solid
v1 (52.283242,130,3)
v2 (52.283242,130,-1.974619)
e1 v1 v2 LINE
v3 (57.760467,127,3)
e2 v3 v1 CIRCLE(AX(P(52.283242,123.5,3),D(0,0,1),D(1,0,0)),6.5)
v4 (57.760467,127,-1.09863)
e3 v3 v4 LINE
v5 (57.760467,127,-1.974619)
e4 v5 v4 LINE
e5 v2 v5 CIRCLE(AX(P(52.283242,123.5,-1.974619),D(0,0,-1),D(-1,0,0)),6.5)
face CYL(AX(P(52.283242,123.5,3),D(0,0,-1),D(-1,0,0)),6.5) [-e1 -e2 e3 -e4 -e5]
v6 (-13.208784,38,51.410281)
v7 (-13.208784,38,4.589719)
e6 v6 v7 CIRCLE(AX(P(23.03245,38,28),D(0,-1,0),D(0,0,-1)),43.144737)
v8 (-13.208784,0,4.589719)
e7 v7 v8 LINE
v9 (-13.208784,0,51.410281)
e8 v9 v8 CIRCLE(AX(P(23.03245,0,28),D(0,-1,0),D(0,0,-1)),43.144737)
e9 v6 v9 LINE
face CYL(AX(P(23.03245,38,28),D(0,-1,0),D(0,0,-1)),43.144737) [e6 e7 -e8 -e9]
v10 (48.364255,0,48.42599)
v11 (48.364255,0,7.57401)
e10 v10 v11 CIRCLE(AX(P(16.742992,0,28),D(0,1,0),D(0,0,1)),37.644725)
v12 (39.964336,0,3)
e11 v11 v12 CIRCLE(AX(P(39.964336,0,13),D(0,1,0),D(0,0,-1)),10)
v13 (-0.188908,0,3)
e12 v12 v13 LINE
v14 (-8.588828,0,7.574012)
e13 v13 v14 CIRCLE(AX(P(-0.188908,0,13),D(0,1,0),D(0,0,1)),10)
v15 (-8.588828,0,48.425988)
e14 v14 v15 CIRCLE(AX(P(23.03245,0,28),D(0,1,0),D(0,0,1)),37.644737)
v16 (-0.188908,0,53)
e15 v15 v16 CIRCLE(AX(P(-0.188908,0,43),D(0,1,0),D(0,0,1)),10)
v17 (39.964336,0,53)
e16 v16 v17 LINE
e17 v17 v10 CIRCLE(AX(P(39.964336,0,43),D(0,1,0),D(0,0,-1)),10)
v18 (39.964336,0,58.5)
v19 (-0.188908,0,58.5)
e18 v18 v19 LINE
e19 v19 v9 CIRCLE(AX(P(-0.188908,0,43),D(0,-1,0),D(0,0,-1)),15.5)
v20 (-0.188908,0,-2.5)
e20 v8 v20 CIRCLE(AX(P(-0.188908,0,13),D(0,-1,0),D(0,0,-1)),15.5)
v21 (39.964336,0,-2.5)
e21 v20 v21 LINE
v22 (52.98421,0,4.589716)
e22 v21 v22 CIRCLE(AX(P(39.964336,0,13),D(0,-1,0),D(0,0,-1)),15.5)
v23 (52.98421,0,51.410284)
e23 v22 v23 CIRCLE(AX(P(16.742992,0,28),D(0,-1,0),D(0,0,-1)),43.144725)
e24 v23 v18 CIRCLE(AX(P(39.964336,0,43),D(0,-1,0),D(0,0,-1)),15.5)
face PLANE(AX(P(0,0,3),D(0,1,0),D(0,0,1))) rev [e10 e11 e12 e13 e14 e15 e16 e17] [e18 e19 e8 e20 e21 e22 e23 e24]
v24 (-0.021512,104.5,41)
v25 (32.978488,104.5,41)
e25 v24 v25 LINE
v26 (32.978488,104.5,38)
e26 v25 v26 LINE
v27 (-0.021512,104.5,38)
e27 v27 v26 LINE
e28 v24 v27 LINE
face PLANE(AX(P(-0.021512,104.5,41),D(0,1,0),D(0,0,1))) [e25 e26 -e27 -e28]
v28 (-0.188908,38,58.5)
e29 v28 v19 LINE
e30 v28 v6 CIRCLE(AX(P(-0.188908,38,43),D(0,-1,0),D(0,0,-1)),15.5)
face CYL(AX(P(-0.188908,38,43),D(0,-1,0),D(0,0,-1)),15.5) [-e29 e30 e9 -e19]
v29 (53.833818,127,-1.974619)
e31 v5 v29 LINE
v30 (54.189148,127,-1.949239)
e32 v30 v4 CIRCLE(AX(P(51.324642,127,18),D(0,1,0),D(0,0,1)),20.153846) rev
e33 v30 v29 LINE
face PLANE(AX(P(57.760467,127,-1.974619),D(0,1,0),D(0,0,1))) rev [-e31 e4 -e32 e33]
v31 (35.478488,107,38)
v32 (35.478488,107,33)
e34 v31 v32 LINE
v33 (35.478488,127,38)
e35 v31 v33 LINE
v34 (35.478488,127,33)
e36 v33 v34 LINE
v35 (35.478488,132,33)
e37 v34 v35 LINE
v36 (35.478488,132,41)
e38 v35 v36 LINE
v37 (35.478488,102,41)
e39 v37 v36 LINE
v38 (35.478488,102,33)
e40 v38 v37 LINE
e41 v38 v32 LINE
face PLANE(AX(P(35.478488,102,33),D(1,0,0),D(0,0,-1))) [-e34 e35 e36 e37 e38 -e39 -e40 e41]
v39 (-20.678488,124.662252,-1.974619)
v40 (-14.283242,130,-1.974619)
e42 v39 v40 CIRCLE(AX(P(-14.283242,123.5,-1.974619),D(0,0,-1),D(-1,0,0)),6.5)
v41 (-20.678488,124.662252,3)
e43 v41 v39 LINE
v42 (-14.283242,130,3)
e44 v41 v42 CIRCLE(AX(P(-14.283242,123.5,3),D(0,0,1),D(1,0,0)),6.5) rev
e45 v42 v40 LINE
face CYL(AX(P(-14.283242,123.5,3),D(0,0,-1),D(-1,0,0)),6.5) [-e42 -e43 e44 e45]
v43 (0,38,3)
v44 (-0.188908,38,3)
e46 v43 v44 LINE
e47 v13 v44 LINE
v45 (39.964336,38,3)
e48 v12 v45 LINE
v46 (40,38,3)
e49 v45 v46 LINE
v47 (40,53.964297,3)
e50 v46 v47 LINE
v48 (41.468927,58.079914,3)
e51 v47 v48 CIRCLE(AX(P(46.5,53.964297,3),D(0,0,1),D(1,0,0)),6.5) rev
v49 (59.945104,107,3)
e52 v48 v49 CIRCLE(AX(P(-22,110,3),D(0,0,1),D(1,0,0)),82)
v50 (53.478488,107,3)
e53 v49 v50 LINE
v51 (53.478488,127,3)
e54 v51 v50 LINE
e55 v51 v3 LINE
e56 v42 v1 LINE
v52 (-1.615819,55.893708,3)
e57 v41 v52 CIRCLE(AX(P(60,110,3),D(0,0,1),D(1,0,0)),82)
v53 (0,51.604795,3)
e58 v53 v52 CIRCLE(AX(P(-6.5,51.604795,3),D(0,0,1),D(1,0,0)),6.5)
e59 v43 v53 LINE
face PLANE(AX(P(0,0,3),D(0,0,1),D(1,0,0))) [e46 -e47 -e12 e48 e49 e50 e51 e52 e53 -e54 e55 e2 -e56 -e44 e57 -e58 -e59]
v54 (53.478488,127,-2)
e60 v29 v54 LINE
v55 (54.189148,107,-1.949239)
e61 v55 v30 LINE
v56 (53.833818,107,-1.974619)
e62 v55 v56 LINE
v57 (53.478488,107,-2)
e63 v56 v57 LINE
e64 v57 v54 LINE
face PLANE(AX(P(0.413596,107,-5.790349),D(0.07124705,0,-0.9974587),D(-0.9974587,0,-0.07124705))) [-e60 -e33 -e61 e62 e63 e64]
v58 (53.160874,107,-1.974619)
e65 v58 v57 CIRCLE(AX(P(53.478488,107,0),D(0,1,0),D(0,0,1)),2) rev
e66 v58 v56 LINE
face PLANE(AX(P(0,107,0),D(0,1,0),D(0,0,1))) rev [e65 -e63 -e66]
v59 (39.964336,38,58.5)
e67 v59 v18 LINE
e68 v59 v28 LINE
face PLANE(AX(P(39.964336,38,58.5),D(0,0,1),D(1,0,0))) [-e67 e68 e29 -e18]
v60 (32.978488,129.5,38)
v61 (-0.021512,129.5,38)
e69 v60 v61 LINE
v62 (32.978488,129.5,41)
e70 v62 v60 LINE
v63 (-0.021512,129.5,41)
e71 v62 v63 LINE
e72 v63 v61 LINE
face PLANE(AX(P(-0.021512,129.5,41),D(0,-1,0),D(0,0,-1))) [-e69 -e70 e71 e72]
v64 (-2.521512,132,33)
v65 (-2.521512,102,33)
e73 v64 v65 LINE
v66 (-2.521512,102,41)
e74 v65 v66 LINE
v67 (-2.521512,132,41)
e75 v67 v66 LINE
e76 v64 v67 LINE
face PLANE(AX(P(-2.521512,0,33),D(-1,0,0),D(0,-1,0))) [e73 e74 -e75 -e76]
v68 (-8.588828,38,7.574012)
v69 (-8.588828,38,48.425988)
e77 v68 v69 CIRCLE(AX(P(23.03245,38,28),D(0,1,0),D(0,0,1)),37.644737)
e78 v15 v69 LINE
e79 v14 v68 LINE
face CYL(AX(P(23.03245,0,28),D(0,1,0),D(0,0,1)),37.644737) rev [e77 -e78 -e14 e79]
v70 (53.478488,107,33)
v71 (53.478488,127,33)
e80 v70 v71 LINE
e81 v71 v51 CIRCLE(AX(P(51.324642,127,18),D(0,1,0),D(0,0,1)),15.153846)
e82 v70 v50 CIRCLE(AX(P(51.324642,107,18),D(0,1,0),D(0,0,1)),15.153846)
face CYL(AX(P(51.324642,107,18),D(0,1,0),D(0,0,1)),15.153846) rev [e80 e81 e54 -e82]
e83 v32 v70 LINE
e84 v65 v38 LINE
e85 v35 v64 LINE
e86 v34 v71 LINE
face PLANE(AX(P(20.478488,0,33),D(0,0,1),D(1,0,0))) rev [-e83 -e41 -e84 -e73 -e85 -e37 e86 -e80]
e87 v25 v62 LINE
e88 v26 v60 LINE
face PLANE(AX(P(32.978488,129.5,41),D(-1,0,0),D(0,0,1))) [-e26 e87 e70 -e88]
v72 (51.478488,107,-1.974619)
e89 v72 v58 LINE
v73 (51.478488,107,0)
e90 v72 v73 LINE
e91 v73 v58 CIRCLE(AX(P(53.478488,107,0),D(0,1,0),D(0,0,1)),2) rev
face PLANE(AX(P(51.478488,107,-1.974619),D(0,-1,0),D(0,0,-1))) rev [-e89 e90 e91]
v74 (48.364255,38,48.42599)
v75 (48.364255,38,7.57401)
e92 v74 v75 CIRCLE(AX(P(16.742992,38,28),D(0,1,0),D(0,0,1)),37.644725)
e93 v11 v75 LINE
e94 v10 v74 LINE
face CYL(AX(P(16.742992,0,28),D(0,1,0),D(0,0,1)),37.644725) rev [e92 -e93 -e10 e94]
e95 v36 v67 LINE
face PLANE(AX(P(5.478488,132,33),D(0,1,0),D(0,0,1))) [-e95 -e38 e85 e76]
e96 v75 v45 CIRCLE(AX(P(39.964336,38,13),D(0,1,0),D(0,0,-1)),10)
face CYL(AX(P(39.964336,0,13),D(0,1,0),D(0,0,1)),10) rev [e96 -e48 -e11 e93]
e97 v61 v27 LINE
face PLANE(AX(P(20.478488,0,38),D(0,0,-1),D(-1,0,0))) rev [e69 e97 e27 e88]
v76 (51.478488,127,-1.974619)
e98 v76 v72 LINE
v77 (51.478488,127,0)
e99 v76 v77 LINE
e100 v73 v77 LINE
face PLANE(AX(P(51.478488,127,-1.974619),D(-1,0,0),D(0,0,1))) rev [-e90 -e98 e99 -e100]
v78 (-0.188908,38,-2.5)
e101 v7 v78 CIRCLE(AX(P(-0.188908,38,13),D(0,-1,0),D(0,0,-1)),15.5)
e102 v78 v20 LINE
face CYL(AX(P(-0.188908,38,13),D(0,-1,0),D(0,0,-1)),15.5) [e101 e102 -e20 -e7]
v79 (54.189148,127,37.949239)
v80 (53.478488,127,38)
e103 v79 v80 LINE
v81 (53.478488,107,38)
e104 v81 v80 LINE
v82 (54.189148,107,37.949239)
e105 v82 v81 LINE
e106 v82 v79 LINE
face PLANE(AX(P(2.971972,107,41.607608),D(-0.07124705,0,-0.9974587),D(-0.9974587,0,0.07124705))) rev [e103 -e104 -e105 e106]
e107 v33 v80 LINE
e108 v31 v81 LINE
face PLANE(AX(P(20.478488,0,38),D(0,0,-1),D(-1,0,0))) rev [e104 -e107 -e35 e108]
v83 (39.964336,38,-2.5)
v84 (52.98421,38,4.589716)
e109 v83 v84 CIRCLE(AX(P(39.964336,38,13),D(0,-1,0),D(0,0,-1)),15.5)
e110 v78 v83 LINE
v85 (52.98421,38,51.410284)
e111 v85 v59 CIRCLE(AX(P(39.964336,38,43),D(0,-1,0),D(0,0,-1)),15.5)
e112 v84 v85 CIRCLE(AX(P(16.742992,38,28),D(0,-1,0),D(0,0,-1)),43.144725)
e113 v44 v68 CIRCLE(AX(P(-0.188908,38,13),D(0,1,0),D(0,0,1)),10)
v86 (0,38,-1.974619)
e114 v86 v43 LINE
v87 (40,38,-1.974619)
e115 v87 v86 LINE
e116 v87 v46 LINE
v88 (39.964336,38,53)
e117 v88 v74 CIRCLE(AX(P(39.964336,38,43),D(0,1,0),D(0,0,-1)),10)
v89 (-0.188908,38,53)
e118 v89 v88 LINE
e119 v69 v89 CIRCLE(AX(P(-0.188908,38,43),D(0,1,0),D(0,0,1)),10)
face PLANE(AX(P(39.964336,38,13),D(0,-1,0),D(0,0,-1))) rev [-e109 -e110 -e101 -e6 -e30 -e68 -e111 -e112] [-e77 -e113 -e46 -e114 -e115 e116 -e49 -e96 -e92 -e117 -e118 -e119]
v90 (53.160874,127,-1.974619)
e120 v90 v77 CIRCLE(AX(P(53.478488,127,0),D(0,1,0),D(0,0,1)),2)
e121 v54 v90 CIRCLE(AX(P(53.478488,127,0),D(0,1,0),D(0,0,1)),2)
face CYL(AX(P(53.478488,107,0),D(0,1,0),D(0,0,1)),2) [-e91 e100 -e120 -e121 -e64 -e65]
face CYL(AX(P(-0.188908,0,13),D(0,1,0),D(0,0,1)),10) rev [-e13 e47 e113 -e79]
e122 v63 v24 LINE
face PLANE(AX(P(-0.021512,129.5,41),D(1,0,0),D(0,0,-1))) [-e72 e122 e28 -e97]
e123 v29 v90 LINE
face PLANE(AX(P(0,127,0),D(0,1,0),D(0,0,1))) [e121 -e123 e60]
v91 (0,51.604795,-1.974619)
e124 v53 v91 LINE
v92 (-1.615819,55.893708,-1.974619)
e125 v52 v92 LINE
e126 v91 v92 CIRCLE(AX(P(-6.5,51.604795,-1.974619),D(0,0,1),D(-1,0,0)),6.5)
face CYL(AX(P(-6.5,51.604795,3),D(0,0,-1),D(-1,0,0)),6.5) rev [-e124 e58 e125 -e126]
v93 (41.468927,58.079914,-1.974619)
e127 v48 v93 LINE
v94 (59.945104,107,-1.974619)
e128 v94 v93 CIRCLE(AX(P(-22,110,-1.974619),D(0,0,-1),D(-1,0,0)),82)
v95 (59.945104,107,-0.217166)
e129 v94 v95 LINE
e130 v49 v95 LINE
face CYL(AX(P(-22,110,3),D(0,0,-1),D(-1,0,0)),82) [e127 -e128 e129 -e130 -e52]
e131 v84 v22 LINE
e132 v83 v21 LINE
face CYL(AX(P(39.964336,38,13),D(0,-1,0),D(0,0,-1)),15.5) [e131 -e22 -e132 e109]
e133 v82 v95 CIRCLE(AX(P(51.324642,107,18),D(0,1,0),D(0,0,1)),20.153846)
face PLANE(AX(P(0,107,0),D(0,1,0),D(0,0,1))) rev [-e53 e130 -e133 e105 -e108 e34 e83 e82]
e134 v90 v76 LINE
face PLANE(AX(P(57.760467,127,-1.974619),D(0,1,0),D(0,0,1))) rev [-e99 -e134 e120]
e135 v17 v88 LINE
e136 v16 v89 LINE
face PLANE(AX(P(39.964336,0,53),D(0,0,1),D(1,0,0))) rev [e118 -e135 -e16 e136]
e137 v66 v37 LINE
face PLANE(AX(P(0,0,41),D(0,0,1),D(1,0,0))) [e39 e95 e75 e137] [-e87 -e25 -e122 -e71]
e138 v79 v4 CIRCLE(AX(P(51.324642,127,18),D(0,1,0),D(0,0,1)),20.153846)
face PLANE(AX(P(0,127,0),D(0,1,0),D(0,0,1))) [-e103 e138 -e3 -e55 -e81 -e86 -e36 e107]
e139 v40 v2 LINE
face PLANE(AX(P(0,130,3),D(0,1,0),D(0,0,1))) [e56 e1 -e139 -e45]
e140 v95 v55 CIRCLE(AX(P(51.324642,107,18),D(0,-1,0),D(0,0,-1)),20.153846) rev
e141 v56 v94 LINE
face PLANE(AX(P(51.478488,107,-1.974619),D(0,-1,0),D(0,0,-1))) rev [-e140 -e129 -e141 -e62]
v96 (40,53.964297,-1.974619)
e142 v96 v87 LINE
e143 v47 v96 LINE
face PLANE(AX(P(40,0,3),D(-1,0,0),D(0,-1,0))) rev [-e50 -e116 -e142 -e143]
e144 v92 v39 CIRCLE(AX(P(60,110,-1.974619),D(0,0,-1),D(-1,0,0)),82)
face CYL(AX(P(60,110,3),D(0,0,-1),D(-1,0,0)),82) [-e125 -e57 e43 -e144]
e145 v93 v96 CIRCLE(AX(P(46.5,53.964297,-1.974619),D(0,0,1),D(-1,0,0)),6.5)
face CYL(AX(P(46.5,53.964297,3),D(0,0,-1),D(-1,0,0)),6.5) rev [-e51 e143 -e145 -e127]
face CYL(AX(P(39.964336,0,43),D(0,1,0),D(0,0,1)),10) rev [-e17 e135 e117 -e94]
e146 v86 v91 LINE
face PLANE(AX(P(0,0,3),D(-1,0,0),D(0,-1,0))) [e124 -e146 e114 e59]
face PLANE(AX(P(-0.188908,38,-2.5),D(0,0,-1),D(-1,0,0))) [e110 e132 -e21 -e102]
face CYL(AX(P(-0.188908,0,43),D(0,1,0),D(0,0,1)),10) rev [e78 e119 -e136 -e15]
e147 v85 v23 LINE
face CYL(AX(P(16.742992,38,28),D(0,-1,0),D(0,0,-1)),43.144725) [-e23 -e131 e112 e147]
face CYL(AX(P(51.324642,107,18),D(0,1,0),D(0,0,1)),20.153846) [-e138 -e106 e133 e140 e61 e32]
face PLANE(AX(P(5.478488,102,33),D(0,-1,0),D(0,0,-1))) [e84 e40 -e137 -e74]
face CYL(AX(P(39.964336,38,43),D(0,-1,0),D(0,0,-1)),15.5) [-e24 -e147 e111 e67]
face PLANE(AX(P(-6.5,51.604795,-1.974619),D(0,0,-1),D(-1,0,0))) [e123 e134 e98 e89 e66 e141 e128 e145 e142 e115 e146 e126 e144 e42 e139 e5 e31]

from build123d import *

# Parameters (mm, degrees)
CROQUIS1_W               = 2.2
CROQUIS1_H               = 25.999999999999993
CROQUIS1_W_2             = 2.200000000000003
CROQUIS1_H_2             = 26
SALIENTE_EXTRUIR2_DEPTH  = 3
SALIENTE_EXTRUIR3_DEPTH  = 20
CROQUIS3_R               = 7.999999999999991
CROQUIS3_R_2             = 8.000000000000002
CORTAR_EXTRUIR1_DEPTH    = 20
SALIENTE_EXTRUIR5_DEPTH  = 53.964297
CORTAR_EXTRUIR2_START    = -60
CROQUIS6_W               = 40.15324264759986
CROQUIS6_H               = 15.964297095512393
CORTAR_EXTRUIR2_DEPTH    = 60
CROQUIS7_W               = 5
CROQUIS7_H               = 20
SALIENTE_EXTRUIR7_DEPTH  = 33
SALIENTE_EXTRUIR8_START  = -5
CROQUIS9_W               = 30
CROQUIS9_H               = 30
SALIENTE_EXTRUIR8_DEPTH  = 5
SALIENTE_EXTRUIR9_START  = -20
SALIENTE_EXTRUIR9_DEPTH  = 20
SALIENTE_EXTRUIR10_START = -3
CROQUIS11_W              = 73.35697538547257
CROQUIS11_H              = 26
CROQUIS11_W_2            = 36
CROQUIS11_H_2            = 25.999999999999993
SALIENTE_EXTRUIR10_DEPTH = 3
CROQUIS12_R              = 15
CROQUIS12_R_2            = 12.499999999999995
SALIENTE_EXTRUIR13_DEPTH = 10
REDONDEO1_R              = 2
CORTAR_EXTRUIR4_DEPTH    = 134.84384260338862
SALIENTE_EXTRUIR15_DEPTH = 38
CROQUIS17_W              = 46
CROQUIS17_H              = 3
CORTAR_EXTRUIR5_DEPTH    = 20
CROQUIS18_W              = 58.34795028380313
CROQUIS18_H              = 55.73720719090147
CORTAR_EXTRUIR6_DEPTH    = 10
SALIENTE_EXTRUIR16_START = -5
SALIENTE_EXTRUIR16_DEPTH = 5
CROQUIS21_W              = 38.00000000000001
CROQUIS21_H              = 29.99999999999997
CROQUIS21_W_2            = 33.00000000000001
CROQUIS21_H_2            = 24.999999999999957
SALIENTE_EXTRUIR17_DEPTH = 3
SALIENTE_EXTRUIR18_DEPTH = 38
SALIENTE_EXTRUIR19_DEPTH = 1.974619


with BuildPart() as part:
    # Croquis1 → Saliente-Extruir2 (new body)
    with BuildSketch(Plane.XY):
        with BuildLine():
            ThreePointArc((1.78e-15, 6.500000000000045), (1.9038059222874422, 1.9038059222874395), (6.500000000000047, 0))
            Line((6.500000000000047, 0), (33.49999999999996, 0))
            ThreePointArc((33.49999999999996, 8.9e-16), (38.09619407771257, 1.9038059222874377), (40.00000000000001, 6.500000000000045))
            Line((40.00000000000001, 6.500000000000045), (39.99999999999999, 53.9642970955124))
            ThreePointArc((39.99999999999999, 53.9642970955124), (40.37823647136178, 56.149248193234044), (41.468926553672304, 58.07991369301713))
            ThreePointArc((41.468926553672304, 58.079913693017126), (57.39093897053555, 89.4797950941834), (58.67848769273629, 124.66225165562912))
            ThreePointArc((58.678487692736276, 124.66225165562913), (56.44829659298618, 128.49022222759615), (52.28324171709256, 130))
            Line((52.28324171709256, 130), (40.00000000000001, 130))
            Line((40.00000000000001, 130), (0, 130))
            Line((0, 130), (-14.283241717092526, 130))
            ThreePointArc((-14.283241717092526, 130), (-18.44829659298616, 128.49022222759615), (-20.678487692736265, 124.66225165562913))
            ThreePointArc((-20.67848769273626, 124.66225165562913), (-19.02022266397784, 88.0955618621395), (-1.615819209039536, 55.89370809971405))
            ThreePointArc((-1.6158192090395262, 55.89370809971404), (-0.41735357178952714, 53.89639076148384), (1.332e-14, 51.6047947173743))
            Line((1.324e-14, 51.6047947173743), (1.67e-15, 6.500000000000047))
        make_face()
        with Locations((3.1, 21.999999999999996)):
            Rectangle(CROQUIS1_W, CROQUIS1_H, mode=Mode.SUBTRACT)
        with Locations((36.9, 21.999999999999996)):
            Rectangle(CROQUIS1_W_2, CROQUIS1_H, mode=Mode.SUBTRACT)
        Polygon((-17.67848769273627, 127), (-15.478487692736273, 127), (-15.47848769273627, 101), (-17.678487692736265, 101), align=None, mode=Mode.SUBTRACT)
        with Locations((54.5784876927363, 114.00000000000001)):
            Rectangle(CROQUIS1_W_2, CROQUIS1_H_2, mode=Mode.SUBTRACT)
    extrude(amount=SALIENTE_EXTRUIR2_DEPTH)

    # Croquis2 → Saliente-Extruir3 (add)
    with BuildSketch(Plane(origin=(0, 0, 0), x_dir=(-1, 0, 0), z_dir=(0, 0, -1))):
        Polygon((4.481512307263694, 116.39887057980759), (4.481512307263693, 113.39887057980759), (-41.51848769273631, 113.39887057980758), (-41.51848769273631, 116.39887057980758), align=None)
    extrude(amount=SALIENTE_EXTRUIR3_DEPTH)

    # Croquis3 → Cortar-Extruir1 (cut)
    with BuildSketch(Plane(origin=(3.512e-14, 116.39887057980759, 0), x_dir=(1, -3e-16, 0), z_dir=(3e-16, 1, 0))):
        with Locations(Location((31.51848769273627, 9.999999999999998, 0), (0, 0, 180))):
            Circle(CROQUIS3_R)
        with Locations(Location((5.5184876927362705, 9.999999999999993, 0), (0, 0, 180))):
            Circle(CROQUIS3_R_2)
        Polygon((24.01848769273627, 20.000000000000004), (18.518487692736272, 20.000000000000004), (18.518487692736272, 15.000000000000005), (24.018487692736272, 15.000000000000004), align=None)
        Polygon((18.518487692736272, 15.000000000000005), (18.518487692736272, 20), (13.018487692736274, 20.000000000000004), (13.018487692736274, 15.000000000000005), align=None)
    extrude(amount=-CORTAR_EXTRUIR1_DEPTH, mode=Mode.SUBTRACT)

    # Croquis5 → Saliente-Extruir5 (add)
    with BuildSketch(Plane.XZ):
        with BuildLine():
            Line((39.96433456524687, 63.000000000000014), (-0.18890808235298706, 63.000000000000014))
            ThreePointArc((-0.18890808235298706, 63.000000000000014), (-7.362306106958867, 61.1735477674232), (-12.788788286604273, 56.138981437410735))
            ThreePointArc((-12.788788286604273, 56.138981437410735), (-19.612286758553036, 32.99999999999998), (-12.788788286604271, 9.861018562589255))
            ThreePointArc((-12.788788286604271, 9.861018562589255), (-7.362306106958855, 4.826452232576806), (-0.18890808235298392, 2.9999999999999956))
            Line((-0.18890808235298392, 2.9999999999999956), (39.96433456524688, 3))
            ThreePointArc((39.96433456524688, 3), (47.137732589852746, 4.826452232576804), (52.56421476949815, 9.861018562589242))
            ThreePointArc((52.56421476949815, 9.861018562589242), (59.38771324144694, 33.00000000000001), (52.56421476949814, 56.13898143741078))
            ThreePointArc((52.56421476949814, 56.13898143741078), (47.13773258985273, 61.17354776742321), (39.96433456524687, 63.000000000000014))
        make_face()
        with BuildLine():
            Line((39.96433456524688, 8), (-0.18890808235298012, 7.999999999999995))
            ThreePointArc((-0.18890808235298012, 7.999999999999995), (-4.971173432090228, 9.217634821717866), (-8.5888282185205, 12.5740123750595))
            ThreePointArc((-8.5888282185205, 12.5740123750595), (-14.612286758553036, 32.99999999999998), (-8.588828218520513, 53.4259876249405))
            ThreePointArc((-8.588828218520513, 53.4259876249405), (-4.971173432090235, 56.78236517828213), (-0.18890808235298706, 58))
            Line((-0.18890808235298706, 58), (39.96433456524687, 58.00000000000001))
            ThreePointArc((39.96433456524687, 58.00000000000001), (44.74659991498412, 56.78236517828215), (48.364254701414396, 53.425987624940525))
            ThreePointArc((48.364254701414396, 53.425987624940525), (54.387713241446946, 33.00000000000001), (48.364254701414396, 12.5740123750595))
            ThreePointArc((48.364254701414396, 12.5740123750595), (44.746599914984124, 9.21763482171787), (39.96433456524688, 8))
        make_face(mode=Mode.SUBTRACT)
    extrude(amount=-SALIENTE_EXTRUIR5_DEPTH)

    # Croquis6 → Cortar-Extruir2 (cut)
    with BuildSketch(Plane.XY.offset(63.000000000000014).offset(CORTAR_EXTRUIR2_START)):
        Polygon((-65.140227080974, 38), (-0.18890808235298706, 38), (-0.18890808235298706, 53.9642970955124), (39.96433456524687, 53.9642970955124), (39.96433456524687, 38), (86.01153637442849, 38), (86.01153637442849, 58.052685675367144), (-65.140227080974, 58.052685675367144), align=None)
        with Locations((19.887713241446942, 45.982148547756196)):
            Rectangle(CROQUIS6_W, CROQUIS6_H)
    extrude(amount=CORTAR_EXTRUIR2_DEPTH, mode=Mode.SUBTRACT)



with BuildPart() as body_2:
    # Croquis7 → Saliente-Extruir7 (new body)
    with BuildSketch(Plane(origin=(53.4784876927363, 0, 0), x_dir=(0, 0, -1), z_dir=(1, 0, 0))):
        with Locations((-35.5, 117.00000000000001)):
            Rectangle(CROQUIS7_W, CROQUIS7_H)
    extrude(amount=-SALIENTE_EXTRUIR7_DEPTH)

    # Croquis9 → Saliente-Extruir8 (add)
    with BuildSketch(Plane.XY.offset(38).offset(SALIENTE_EXTRUIR8_START)):
        with Locations((20.478487692736316, 117.00000000000003)):
            Rectangle(CROQUIS9_W, CROQUIS9_H)
    extrude(amount=SALIENTE_EXTRUIR8_DEPTH)


with BuildPart() as part_1:
    add(part.part)

    add(body_2.part)  # Saliente-Extruir9 merges body 2
    # Croquis10 → Saliente-Extruir9 (add)
    with BuildSketch(Plane(origin=(0, 127, 0), x_dir=(1, 0, 0), z_dir=(0, 1, 0)).offset(SALIENTE_EXTRUIR9_START)):
        with BuildLine():
            Line((54.189147591213455, -37.94923857868021), (53.4784876927363, -38))
            Line((53.4784876927363, -38), (53.4784876927363, -33))
            ThreePointArc((53.4784876927363, -33), (66.4784876927363, -18.000000000000004), (53.4784876927363, -2.9999999999999996))
            Line((53.4784876927363, -2.9999999999999996), (53.4784876927363, 0))
            Line((53.4784876927363, 0), (51.4784876927363, -4.3e-16))
            Line((51.4784876927363, -4.3e-16), (51.4784876927363, 1.9999999999999996))
            Line((51.4784876927363, 1.9999999999999996), (53.4784876927363, 2))
            Line((53.4784876927363, 2), (54.18914759121346, 1.9492385786802033))
            ThreePointArc((54.18914759121346, 1.9492385786802033), (71.47848769273631, -18.000000000000007), (54.189147591213455, -37.94923857868021))
        make_face()
    extrude(amount=SALIENTE_EXTRUIR9_DEPTH)

    # Croquis11 → Saliente-Extruir10 (add)
    with BuildSketch(Plane(origin=(0, 0, 0), x_dir=(-1, 0, 0), z_dir=(0, 0, -1)).offset(SALIENTE_EXTRUIR10_START)):
        with Locations((-19.000000000000018, 114.00000000000001)):
            Rectangle(CROQUIS11_W, CROQUIS11_H)
        with Locations((-20, 21.999999999999996)):
            Rectangle(CROQUIS11_W_2, CROQUIS11_H_2)
    extrude(amount=SALIENTE_EXTRUIR10_DEPTH)

    # Croquis12 → Saliente-Extruir13 (add)
    with BuildSketch(Plane.XY.offset(38)):
        with Locations(Location((20.478487692736316, 117.00000000000003, 0), (0, 0, 180))):
            Circle(CROQUIS12_R)
        with Locations((20.478487692736316, 117.00000000000003)):
            Circle(CROQUIS12_R_2, mode=Mode.SUBTRACT)
    extrude(amount=SALIENTE_EXTRUIR13_DEPTH)

    # Redondeo1
    redondeo1_edges = [part_1.edges().sort_by_distance(p)[0] for p in [
        (51.4784876927363, 117, -1.9999999999999996),
    ]]
    fillet(redondeo1_edges, radius=REDONDEO1_R - 0.0001)  # a hair under: the kernel refuses the full size

    # Croquis14 → Cortar-Extruir4 (cut, through all)
    with BuildSketch(Plane(origin=(0, 38, 0), x_dir=(1, 0, 0), z_dir=(0, 1, 0))):
        with BuildLine():
            ThreePointArc((48.36425493229366, -7.57401013919257), (44.74660042130513, -4.217634185252958), (39.96433624040055, -2.9999999999999822))
            Line((39.96433624040055, -2.999999999999983), (7.11e-15, -2.999999999999993))
            Line((7.11e-15, -2.999999999999993), (-0.18890808235298095, -2.999999999999993))
            ThreePointArc((-0.1889080823529836, -2.999999999999993), (-4.9711734320902385, -4.217634821717869), (-8.58882821852051, -7.5740123750595165))
            ThreePointArc((-8.588828218520508, -7.574012375059517), (-14.612286758553015, -27.99999999999999), (-8.588828218520522, -48.42598762494047))
            ThreePointArc((-8.588828218520526, -48.425987624940475), (-4.971173432090255, -51.78236517828213), (-0.18890808235300008, -53.00000000000001))
            Line((-0.18890808235300227, -53.00000000000001), (39.964336240400556, -53.00000000000002))
            ThreePointArc((39.964336240400556, -53.00000000000002), (44.74660042130514, -51.78236581474704), (48.36425493229367, -48.42598986080743))
            ThreePointArc((48.36425493229366, -48.42598986080742), (54.38771708653283, -27.999999999999993), (48.36425493229366, -7.574010139192573))
        make_face()
        with BuildLine():
            ThreePointArc((52.56421476949813, -56.13898143741079), (59.326001019675516, -35.29338058691803), (54.84218308379573, -13.842128762629663))
            ThreePointArc((54.84218308379583, -13.842128762629622), (57.147087828663246, -32.41618815306372), (50.88423053986159, -50.05378681904967))
            ThreePointArc((50.88423053986159, -50.05378681904967), (46.181279675576505, -54.41707555917115), (39.964336240400556, -56.00000000000002))
            Line((39.964336240400556, -56.00000000000002), (-0.18890808235300227, -56.00000000000002))
            ThreePointArc((-0.18890808235300094, -56.00000000000002), (-6.40585303701144, -54.417074731766775), (-11.108804259370787, -50.05378391242262))
            ThreePointArc((-11.108804259370793, -50.05378391242262), (-17.37165915295804, -32.41617365692677), (-15.066744784377477, -13.84210526315766))
            ThreePointArc((-15.066744784377445, -13.84210526315767), (-19.550575244054688, -35.29336745437739), (-12.788788286604277, -56.138981437410735))
            ThreePointArc((-12.788788286604277, -56.138981437410735), (-7.362306106958864, -61.17354776742319), (-0.18890808235299072, -63))
            Line((-0.18890808235298845, -63), (39.96433456524687, -63.000000000000014))
            ThreePointArc((39.96433456524687, -63.000000000000014), (47.137732589852725, -61.173547767423216), (52.56421476949813, -56.13898143741079))
        make_face()
    extrude(amount=-CORTAR_EXTRUIR4_DEPTH, mode=Mode.SUBTRACT)


with BuildPart() as cortar_extruir4_piece_1:
    # of the separate pieces the step leaves, piece 1, a body of its own (cortar_extruir4_pieces)
    add(part_1.part.solids().sort_by_distance((51.478487693, 127, -0.0001))[0])



with BuildPart() as cortar_extruir4_piece_2:
    # of the separate pieces the step leaves, piece 2, a body of its own (cortar_extruir4_pieces)
    add(part_1.part.solids().sort_by_distance((39.964334565, 0, 3))[0])


with BuildPart() as cortar_extruir4_piece_3:
    # of the separate pieces the step leaves, piece 3, a body of its own (cortar_extruir4_pieces)
    add(part_1.part.solids().sort_by_distance((-0.188908082, 38, 3))[0])


with BuildPart() as cortar_extruir4_piece_1_1:
    add(cortar_extruir4_piece_1.part)

    add(cortar_extruir4_piece_2.part)  # Saliente-Extruir15 merges Cortar-Extruir4 piece 2

    add(cortar_extruir4_piece_3.part)  # Saliente-Extruir15 merges Cortar-Extruir4 piece 3
    # Croquis16 → Saliente-Extruir15 (add)
    with BuildSketch(Plane(origin=(0, 38, 0), x_dir=(1, 0, 0), z_dir=(0, 1, 0))):
        with BuildLine():
            Line((39.96433624040056, 6.07e-15), (-0.18890808235298012, 6.07e-15))
            ThreePointArc((-0.18890808235298012, 6.07e-15), (-6.405853037011415, -1.5829252682332342), (-11.108804259370778, -5.946216087577372))
            ThreePointArc((-11.108804259370778, -5.946216087577372), (-17.61228675855303, -27.999999999999996), (-11.108804259370793, -50.05378391242263))
            ThreePointArc((-11.108804259370793, -50.05378391242263), (-6.405853037011435, -54.417074731766775), (-0.1889080823529964, -56.000000000000014))
            Line((-0.1889080823529964, -56.000000000000014), (39.96433624040056, -56.00000000000002))
            ThreePointArc((39.96433624040056, -56.00000000000002), (46.18127967557652, -54.417075559171145), (50.884230539861605, -50.053786819049655))
            ThreePointArc((50.884230539861605, -50.053786819049655), (57.387717086532845, -28.00000000000002), (50.88423053986163, -5.946213180950382))
            ThreePointArc((50.88423053986163, -5.946213180950382), (46.18127967557653, -1.5829244408288794), (39.96433624040056, 6.07e-15))
        make_face()
        with BuildLine():
            Line((39.96433624040056, -2.999999999999994), (-0.18890808235298012, -2.999999999999994))
            ThreePointArc((-0.18890808235298012, -2.999999999999994), (-4.971173432090238, -4.217634821717871), (-8.588828218520524, -7.574012375059513))
            ThreePointArc((-8.588828218520524, -7.574012375059513), (-14.61228675855303, -27.999999999999996), (-8.588828218520524, -48.42598762494049))
            ThreePointArc((-8.588828218520524, -48.42598762494049), (-4.97117343209025, -51.782365178282134), (-0.188908082352994, -53.00000000000002))
            Line((-0.188908082352994, -53.00000000000002), (39.96433624040056, -53.00000000000002))
            ThreePointArc((39.96433624040056, -53.00000000000002), (44.746600421305146, -51.78236581474704), (48.364254932293676, -48.42598986080743))
            ThreePointArc((48.364254932293676, -48.42598986080743), (54.387717086532845, -28.000000000000004), (48.364254932293676, -7.574010139192587))
            ThreePointArc((48.364254932293676, -7.574010139192587), (44.746600421305146, -4.217634185252978), (39.96433624040056, -2.999999999999994))
        make_face(mode=Mode.SUBTRACT)
    extrude(amount=-SALIENTE_EXTRUIR15_DEPTH)

    # Croquis17 → Cortar-Extruir5 (cut)
    with BuildSketch(Plane(origin=(0, 0, -20), x_dir=(-1, 0, 0), z_dir=(0, 0, -1))):
        with Locations((-18.518487692736308, 114.89887057980759)):
            Rectangle(CROQUIS17_W, CROQUIS17_H)
    extrude(amount=-CORTAR_EXTRUIR5_DEPTH, mode=Mode.SUBTRACT)

    # Croquis18 → Cortar-Extruir6 (cut)
    with BuildSketch(Plane.XY.offset(48)):
        with Locations((19.45719587983774, 118.79603010754636)):
            Rectangle(CROQUIS18_W, CROQUIS18_H)
    extrude(amount=-CORTAR_EXTRUIR6_DEPTH, mode=Mode.SUBTRACT)

    # Croquis20 → Saliente-Extruir16 (add)
    with BuildSketch(Plane.XY.offset(38).offset(SALIENTE_EXTRUIR16_START)):
        Polygon((5.478487692736317, 104.49999999999999), (5.478487692736317, 129.5), (-0.02151230726369135, 129.5), (-0.02151230726368802, 104.49999999999999), align=None)
        Polygon((-0.02151230726369135, 129.5), (5.478487692736316, 129.5), (5.478487692736317, 132.00000000000003), (-2.5215123072636914, 132), (-2.5215123072636847, 101.99999999999999), (5.478487692736316, 101.99999999999999), (5.478487692736317, 104.49999999999999), (-0.02151230726369135, 104.49999999999999), align=None)
    extrude(amount=SALIENTE_EXTRUIR16_DEPTH)

    # Croquis21 → Saliente-Extruir17 (add)
    with BuildSketch(Plane.XY.offset(38)):
        with Locations((16.478487692736312, 117.00000000000001)):
            Rectangle(CROQUIS21_W, CROQUIS21_H)
        with Locations((16.478487692736312, 117.00000000000003)):
            Rectangle(CROQUIS21_W_2, CROQUIS21_H_2, mode=Mode.SUBTRACT)
    extrude(amount=SALIENTE_EXTRUIR17_DEPTH)

    # Croquis22 → Saliente-Extruir18 (add)
    with BuildSketch(Plane.XZ):
        with BuildLine():
            Line((-0.18890808235298298, -2.5000000000000075), (39.96433624040056, -2.500000000000006))
            ThreePointArc((39.96433624040056, -2.500000000000006), (47.376845720802685, -0.6126670128578695), (52.98421021283491, 4.589715715748548))
            ThreePointArc((52.98421021283491, 4.589715715748548), (59.88771708653283, 28.000000000000032), (52.98421021283489, 51.41028428425151))
            ThreePointArc((52.98421021283489, 51.41028428425151), (47.37684572080267, 56.612667012857905), (39.96433624040056, 58.50000000000002))
            Line((39.96433624040056, 58.50000000000002), (-0.18890808235299306, 58.50000000000001))
            ThreePointArc((-0.18890808235299306, 58.50000000000001), (-7.601419374445746, 56.612666026337294), (-13.20878429341268, 51.41028081865773))
            ThreePointArc((-13.20878429341268, 51.41028081865773), (-20.11228675855303, 27.999999999999986), (-13.208784293412673, 4.589719181342242))
            ThreePointArc((-13.208784293412673, 4.589719181342242), (-7.601419374445738, -0.6126660263373136), (-0.18890808235298298, -2.5000000000000075))
        make_face()
        with BuildLine():
            Line((-0.1889080823529825, -6.94e-15), (39.96433624040056, -6.07e-15))
            ThreePointArc((39.96433624040056, -6.07e-15), (46.18127967557653, 1.582924440828883), (50.88423053986163, 5.946213180950394))
            ThreePointArc((50.88423053986163, 5.946213180950394), (57.387717086532845, 28.000000000000032), (50.884230539861605, 50.05378681904966))
            ThreePointArc((50.884230539861605, 50.05378681904966), (46.18127967557652, 54.41707555917115), (39.96433624040056, 56.00000000000002))
            Line((39.96433624040056, 56.00000000000002), (-0.18890808235299322, 56.000000000000014))
            ThreePointArc((-0.18890808235299322, 56.000000000000014), (-6.405853037011434, 54.417074731766775), (-11.108804259370794, 50.053783912422624))
            ThreePointArc((-11.108804259370794, 50.053783912422624), (-17.612286758553036, 27.999999999999986), (-11.108804259370785, 5.946216087577363))
            ThreePointArc((-11.108804259370785, 5.946216087577363), (-6.405853037011422, 1.5829252682332218), (-0.1889080823529825, -6.94e-15))
        make_face(mode=Mode.SUBTRACT)
    extrude(amount=-SALIENTE_EXTRUIR18_DEPTH)

    # Croquis23 → Saliente-Extruir19 (add)
    with BuildSketch(Plane(origin=(0, 0, 0), x_dir=(-1, 0, 0), z_dir=(0, 0, -1))):
        with BuildLine():
            Line((-39.99999999999999, 38), (-6.94e-15, 38))
            Line((-6.94e-15, 38), (-1.324e-14, 51.6047947173743))
            ThreePointArc((-1.324e-14, 51.6047947173743), (0.4173535717895369, 53.89639076148386), (1.615819209039554, 55.893708099714054))
            ThreePointArc((1.615819209039554, 55.893708099714054), (19.020222663977847, 88.09556186213952), (20.67848769273625, 124.66225165562916))
            ThreePointArc((20.67848769273625, 124.66225165562916), (18.448296592986146, 128.49022222759615), (14.283241717092526, 130))
            Line((14.283241717092526, 130), (-52.28324171709256, 130))
            ThreePointArc((-52.28324171709256, 130), (-55.40574071629176, 129.20087712549568), (-57.76046729214422, 127))
            Line((-57.76046729214422, 127), (-51.4784876927363, 127))
            Line((-51.4784876927363, 127), (-51.4784876927363, 107))
            Line((-51.4784876927363, 107), (-59.945103575503516, 107))
            ThreePointArc((-59.945103575503516, 107), (-54.711170964031545, 81.02766406850974), (-41.46892655367233, 58.07991369301716))
            ThreePointArc((-41.46892655367233, 58.07991369301716), (-40.37823647136178, 56.149248193234065), (-39.999999999999986, 53.9642970955124))
            Line((-39.999999999999986, 53.9642970955124), (-39.99999999999999, 38))
        make_face()
    extrude(amount=SALIENTE_EXTRUIR19_DEPTH)


solid = cortar_extruir4_piece_1_1.part
